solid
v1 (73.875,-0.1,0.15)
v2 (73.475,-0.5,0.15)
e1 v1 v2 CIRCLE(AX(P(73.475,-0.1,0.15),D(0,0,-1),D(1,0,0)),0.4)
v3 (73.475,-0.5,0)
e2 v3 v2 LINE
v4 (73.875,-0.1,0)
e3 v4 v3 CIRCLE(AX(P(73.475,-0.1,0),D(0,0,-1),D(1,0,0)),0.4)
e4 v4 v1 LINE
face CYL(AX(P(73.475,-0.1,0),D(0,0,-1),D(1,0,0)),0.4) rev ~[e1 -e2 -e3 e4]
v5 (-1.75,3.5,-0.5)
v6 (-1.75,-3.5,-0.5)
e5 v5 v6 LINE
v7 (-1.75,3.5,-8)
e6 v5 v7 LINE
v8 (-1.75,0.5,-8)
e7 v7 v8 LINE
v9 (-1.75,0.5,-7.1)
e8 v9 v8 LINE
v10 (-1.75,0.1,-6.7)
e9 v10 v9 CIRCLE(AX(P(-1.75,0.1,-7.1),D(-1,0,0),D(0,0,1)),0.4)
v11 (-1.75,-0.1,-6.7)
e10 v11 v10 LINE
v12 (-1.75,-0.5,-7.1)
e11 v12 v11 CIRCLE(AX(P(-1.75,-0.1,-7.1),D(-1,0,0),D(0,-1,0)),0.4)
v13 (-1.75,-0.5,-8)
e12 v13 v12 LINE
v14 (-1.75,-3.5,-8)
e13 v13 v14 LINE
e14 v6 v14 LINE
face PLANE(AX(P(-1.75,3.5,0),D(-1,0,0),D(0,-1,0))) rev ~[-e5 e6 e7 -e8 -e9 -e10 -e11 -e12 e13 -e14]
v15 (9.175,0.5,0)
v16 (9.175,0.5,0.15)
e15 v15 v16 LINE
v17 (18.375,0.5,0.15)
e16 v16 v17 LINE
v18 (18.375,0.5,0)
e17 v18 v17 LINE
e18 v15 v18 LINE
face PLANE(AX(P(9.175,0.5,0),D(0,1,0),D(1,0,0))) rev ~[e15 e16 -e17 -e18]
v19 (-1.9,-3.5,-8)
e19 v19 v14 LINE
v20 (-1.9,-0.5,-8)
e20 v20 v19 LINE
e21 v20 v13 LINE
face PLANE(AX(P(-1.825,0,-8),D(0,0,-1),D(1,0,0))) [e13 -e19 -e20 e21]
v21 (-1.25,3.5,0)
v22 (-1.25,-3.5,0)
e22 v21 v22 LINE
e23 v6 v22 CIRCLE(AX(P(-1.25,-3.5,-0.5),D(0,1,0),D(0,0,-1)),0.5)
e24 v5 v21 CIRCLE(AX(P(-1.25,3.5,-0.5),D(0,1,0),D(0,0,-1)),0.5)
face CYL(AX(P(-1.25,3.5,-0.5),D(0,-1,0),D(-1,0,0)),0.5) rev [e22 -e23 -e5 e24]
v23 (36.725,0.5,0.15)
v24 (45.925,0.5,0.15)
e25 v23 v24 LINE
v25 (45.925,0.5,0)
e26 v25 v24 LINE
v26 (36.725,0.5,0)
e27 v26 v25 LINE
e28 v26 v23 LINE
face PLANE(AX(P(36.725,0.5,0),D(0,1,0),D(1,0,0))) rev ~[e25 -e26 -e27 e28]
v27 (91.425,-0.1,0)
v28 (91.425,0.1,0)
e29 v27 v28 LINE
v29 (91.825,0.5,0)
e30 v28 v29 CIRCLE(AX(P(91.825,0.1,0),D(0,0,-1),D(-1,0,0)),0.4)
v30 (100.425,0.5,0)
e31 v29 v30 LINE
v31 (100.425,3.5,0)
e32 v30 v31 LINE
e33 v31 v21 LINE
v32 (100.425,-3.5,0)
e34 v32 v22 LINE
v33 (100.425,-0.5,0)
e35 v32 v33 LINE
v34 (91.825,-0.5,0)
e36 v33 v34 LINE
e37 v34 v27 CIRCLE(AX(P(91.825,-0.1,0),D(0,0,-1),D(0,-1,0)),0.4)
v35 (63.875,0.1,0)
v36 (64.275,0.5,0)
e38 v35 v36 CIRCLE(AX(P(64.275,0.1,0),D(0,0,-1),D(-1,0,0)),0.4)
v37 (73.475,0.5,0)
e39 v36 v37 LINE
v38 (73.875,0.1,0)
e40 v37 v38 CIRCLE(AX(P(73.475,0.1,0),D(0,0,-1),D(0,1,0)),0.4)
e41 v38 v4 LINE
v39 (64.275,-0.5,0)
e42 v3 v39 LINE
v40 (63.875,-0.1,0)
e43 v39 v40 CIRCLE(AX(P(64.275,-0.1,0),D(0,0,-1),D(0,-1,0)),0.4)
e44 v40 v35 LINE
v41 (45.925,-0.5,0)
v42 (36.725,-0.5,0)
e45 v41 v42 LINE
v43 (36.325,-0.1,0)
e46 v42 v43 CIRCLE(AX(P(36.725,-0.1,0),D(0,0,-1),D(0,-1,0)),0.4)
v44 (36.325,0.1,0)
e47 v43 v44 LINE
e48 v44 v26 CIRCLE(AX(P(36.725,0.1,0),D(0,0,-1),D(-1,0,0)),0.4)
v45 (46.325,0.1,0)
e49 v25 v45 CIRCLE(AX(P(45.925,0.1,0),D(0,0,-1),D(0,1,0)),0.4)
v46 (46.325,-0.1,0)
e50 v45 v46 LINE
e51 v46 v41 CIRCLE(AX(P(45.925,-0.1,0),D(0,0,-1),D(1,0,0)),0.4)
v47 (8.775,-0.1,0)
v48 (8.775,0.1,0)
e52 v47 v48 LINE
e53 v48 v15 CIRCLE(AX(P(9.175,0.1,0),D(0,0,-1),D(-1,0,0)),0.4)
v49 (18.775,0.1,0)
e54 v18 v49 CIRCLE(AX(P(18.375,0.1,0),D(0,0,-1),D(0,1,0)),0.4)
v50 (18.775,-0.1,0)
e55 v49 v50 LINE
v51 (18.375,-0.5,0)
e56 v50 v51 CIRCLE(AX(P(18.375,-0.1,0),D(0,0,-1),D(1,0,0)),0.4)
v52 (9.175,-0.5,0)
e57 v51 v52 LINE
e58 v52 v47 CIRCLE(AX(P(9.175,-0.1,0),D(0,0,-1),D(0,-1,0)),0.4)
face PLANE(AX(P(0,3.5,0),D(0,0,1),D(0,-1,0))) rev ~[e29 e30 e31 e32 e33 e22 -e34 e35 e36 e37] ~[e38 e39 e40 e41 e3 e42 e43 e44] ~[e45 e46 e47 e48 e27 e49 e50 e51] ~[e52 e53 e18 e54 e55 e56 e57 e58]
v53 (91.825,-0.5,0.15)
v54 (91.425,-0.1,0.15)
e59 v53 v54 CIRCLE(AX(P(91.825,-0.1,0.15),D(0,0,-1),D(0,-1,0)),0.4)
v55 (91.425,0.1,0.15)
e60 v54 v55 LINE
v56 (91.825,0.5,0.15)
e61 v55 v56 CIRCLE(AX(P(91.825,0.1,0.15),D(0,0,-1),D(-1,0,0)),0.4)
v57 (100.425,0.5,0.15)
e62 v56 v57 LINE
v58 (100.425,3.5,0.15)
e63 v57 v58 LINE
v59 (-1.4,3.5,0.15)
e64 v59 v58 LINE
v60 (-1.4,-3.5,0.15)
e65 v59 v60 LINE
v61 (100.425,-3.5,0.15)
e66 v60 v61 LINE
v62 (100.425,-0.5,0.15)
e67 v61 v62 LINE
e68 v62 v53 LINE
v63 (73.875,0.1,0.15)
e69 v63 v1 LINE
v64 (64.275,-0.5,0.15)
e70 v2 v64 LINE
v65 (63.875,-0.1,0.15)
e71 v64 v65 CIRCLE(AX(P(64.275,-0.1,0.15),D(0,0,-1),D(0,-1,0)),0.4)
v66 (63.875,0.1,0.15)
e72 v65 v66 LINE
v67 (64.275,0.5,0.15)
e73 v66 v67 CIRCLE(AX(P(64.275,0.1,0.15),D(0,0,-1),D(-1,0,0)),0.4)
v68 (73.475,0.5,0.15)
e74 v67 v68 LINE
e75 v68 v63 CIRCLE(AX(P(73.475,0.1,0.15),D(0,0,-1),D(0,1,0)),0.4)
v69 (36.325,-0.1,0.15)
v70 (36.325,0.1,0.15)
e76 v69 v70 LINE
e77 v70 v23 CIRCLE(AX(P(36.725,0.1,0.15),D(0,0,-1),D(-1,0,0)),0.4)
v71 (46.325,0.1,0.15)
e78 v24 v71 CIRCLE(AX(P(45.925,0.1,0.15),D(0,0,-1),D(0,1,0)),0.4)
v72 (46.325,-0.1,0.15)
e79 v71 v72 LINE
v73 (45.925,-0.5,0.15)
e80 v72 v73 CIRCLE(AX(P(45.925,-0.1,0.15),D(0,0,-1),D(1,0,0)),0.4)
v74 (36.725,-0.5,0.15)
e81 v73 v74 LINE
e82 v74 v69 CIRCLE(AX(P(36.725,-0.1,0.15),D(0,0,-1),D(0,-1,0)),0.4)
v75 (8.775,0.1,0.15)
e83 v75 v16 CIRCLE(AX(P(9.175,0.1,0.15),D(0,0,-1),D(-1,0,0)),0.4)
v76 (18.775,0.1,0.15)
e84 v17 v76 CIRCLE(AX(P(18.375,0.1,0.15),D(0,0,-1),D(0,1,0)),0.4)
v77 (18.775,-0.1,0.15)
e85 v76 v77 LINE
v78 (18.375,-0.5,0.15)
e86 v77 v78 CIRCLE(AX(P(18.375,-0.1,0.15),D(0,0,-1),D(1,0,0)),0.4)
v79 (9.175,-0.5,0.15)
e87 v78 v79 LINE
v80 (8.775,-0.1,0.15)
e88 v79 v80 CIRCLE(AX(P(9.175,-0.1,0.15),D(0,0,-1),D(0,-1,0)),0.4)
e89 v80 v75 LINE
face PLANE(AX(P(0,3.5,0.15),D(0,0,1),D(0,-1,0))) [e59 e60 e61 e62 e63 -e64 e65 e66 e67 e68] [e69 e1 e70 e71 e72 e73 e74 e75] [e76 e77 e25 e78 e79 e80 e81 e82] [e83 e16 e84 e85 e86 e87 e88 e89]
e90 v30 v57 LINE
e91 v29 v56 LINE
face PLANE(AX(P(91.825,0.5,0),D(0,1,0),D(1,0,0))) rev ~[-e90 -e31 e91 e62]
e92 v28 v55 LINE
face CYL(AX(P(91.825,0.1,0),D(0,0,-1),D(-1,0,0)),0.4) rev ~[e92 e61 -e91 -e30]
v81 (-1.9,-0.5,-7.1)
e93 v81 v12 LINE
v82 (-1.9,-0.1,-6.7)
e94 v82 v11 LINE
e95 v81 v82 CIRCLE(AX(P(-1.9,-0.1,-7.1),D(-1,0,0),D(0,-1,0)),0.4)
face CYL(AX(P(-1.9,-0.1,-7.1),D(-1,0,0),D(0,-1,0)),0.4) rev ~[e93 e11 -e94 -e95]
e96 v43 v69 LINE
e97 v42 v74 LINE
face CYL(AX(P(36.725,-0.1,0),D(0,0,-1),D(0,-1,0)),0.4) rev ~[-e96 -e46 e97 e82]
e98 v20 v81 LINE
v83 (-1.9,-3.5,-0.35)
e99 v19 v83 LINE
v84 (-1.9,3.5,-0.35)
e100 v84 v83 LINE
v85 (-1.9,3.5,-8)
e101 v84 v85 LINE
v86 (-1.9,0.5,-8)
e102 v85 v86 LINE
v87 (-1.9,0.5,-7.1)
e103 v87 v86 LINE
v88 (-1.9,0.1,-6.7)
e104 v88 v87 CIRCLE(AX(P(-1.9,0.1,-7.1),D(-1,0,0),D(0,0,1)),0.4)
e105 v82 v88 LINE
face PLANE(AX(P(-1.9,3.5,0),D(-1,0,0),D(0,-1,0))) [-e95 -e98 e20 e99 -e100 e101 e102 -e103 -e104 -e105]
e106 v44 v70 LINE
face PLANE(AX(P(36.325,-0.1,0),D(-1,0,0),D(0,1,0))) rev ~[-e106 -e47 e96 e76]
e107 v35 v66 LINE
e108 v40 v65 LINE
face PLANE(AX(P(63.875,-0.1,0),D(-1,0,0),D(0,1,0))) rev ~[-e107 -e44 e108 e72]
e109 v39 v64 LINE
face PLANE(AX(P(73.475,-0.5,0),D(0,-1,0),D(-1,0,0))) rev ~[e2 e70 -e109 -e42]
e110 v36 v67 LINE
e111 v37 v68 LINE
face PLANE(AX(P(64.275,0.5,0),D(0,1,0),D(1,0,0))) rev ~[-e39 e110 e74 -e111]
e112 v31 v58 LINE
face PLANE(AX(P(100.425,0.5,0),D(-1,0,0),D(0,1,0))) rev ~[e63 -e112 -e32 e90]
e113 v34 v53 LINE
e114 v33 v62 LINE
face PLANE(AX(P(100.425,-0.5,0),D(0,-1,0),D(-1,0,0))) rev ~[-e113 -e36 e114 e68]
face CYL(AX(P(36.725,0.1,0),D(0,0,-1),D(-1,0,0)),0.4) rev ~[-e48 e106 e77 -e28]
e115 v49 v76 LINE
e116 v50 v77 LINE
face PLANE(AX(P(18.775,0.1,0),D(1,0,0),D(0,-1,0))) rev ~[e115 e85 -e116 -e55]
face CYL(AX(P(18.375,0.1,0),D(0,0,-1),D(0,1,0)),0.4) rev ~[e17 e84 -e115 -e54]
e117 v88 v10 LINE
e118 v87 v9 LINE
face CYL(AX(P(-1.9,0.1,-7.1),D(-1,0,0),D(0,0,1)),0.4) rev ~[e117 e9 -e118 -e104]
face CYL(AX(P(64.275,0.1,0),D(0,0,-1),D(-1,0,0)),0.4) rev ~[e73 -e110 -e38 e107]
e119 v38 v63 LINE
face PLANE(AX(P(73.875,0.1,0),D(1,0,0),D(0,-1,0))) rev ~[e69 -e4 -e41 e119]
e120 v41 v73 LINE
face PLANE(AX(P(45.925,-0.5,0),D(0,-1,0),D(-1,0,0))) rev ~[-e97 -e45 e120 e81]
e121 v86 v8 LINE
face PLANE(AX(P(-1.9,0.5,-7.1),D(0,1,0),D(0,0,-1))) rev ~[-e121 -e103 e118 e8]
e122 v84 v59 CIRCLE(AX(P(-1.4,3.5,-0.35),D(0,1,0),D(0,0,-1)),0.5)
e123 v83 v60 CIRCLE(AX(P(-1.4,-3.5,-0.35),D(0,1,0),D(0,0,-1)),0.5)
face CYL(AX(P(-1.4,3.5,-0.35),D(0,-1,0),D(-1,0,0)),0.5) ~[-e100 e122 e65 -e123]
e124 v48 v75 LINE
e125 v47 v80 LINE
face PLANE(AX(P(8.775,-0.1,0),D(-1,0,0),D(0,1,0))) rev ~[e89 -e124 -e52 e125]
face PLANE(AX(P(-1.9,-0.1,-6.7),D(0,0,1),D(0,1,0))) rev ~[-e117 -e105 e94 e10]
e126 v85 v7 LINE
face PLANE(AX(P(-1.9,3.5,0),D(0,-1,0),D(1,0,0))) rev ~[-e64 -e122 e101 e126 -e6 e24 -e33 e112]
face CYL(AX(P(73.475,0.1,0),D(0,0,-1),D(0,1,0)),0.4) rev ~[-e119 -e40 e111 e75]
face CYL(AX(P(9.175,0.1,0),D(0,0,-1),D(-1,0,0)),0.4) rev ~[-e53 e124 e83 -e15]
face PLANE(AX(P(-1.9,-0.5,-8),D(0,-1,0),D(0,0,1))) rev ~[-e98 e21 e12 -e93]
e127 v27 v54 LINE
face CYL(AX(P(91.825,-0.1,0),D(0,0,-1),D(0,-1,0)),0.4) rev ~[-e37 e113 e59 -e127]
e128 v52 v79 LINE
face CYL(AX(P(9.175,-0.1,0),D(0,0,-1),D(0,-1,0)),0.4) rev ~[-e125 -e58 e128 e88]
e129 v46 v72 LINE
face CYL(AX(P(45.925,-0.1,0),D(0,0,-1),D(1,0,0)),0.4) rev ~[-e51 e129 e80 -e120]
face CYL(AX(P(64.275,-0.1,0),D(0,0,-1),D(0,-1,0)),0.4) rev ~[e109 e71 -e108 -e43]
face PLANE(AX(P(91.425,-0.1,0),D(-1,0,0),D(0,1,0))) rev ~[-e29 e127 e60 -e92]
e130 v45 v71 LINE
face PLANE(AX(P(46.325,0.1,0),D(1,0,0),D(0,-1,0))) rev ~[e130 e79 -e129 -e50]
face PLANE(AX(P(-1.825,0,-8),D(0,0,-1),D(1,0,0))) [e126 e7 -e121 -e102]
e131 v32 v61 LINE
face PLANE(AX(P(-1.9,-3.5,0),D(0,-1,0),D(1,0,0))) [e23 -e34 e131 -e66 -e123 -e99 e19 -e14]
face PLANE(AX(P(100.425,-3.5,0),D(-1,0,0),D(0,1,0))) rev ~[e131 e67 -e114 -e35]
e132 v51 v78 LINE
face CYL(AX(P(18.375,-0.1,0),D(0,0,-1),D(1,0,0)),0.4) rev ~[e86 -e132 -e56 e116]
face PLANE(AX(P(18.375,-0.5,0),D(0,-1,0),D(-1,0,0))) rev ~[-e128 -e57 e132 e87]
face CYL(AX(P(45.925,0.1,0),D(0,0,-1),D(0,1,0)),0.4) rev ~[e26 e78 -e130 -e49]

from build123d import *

# Parameters (mm, degrees)
F0_W     = 4
F0_H     = 3
F1_DEPTH = 0.15
F2_DEPTH = 1.9
F3_W     = 0.15
F3_H     = 7
F4_DEPTH = 8
F6_DEPTH = 25
F7_R     = 0.5


with BuildPart() as f1:
    # F0 (on Top) → F1 (new body)
    with BuildSketch(Plane.XY):
        with BuildLine():
            Line((0, 3.5), (0, -3.5))
            Line((0, -3.5), (13.775, -3.5))
            Line((13.775, -3.5), (13.775, -0.5))
            Line((13.775, -0.5), (9.175, -0.5))
            ThreePointArc((9.175, -0.5), (8.8921572875, -0.3828427125), (8.775, -0.1))
            Line((8.775, -0.1), (8.775, 0.1))
            ThreePointArc((8.775, 0.1), (8.8921572875, 0.3828427125), (9.175, 0.5))
            Line((9.175, 0.5), (13.775, 0.5))
            Line((13.775, 0.5), (13.775, 3.5))
            Line((13.775, 3.5), (0, 3.5))
        make_face()
        with BuildLine():
            Line((13.775, -0.5), (13.775, -3.5))
            Line((13.775, -3.5), (27.55, -3.5))
            Line((27.55, -3.5), (41.325, -3.5))
            Line((41.325, -3.5), (41.325, -0.5))
            Line((41.325, -0.5), (36.725, -0.5))
            ThreePointArc((36.725, -0.5), (36.4421572875, -0.3828427125), (36.325, -0.1))
            Line((36.325, -0.1), (36.325, 0.1))
            ThreePointArc((36.325, 0.1), (36.4421572875, 0.3828427125), (36.725, 0.5))
            Line((36.725, 0.5), (41.325, 0.5))
            Line((41.325, 0.5), (41.325, 3.5))
            Line((41.325, 3.5), (27.55, 3.5))
            Line((27.55, 3.5), (13.775, 3.5))
            Line((13.775, 3.5), (13.775, 0.5))
            Line((13.775, 0.5), (18.375, 0.5))
            ThreePointArc((18.375, 0.5), (18.6578427125, 0.3828427125), (18.775, 0.1))
            Line((18.775, 0.1), (18.775, -0.1))
            ThreePointArc((18.775, -0.1), (18.6578427125, -0.3828427125), (18.375, -0.5))
            Line((18.375, -0.5), (13.775, -0.5))
        make_face()
        with BuildLine():
            Line((41.325, -0.5), (41.325, -3.5))
            Line((41.325, -3.5), (55.1, -3.5))
            Line((55.1, -3.5), (68.875, -3.5))
            Line((68.875, -3.5), (68.875, -0.5))
            Line((68.875, -0.5), (64.275, -0.5))
            ThreePointArc((64.275, -0.5), (63.9921572875, -0.3828427125), (63.875, -0.1))
            Line((63.875, -0.1), (63.875, 0.1))
            ThreePointArc((63.875, 0.1), (63.9921572875, 0.3828427125), (64.275, 0.5))
            Line((64.275, 0.5), (68.875, 0.5))
            Line((68.875, 0.5), (68.875, 3.5))
            Line((68.875, 3.5), (55.1, 3.5))
            Line((55.1, 3.5), (41.325, 3.5))
            Line((41.325, 3.5), (41.325, 0.5))
            Line((41.325, 0.5), (45.925, 0.5))
            ThreePointArc((45.925, 0.5), (46.2078427125, 0.3828427125), (46.325, 0.1))
            Line((46.325, 0.1), (46.325, -0.1))
            ThreePointArc((46.325, -0.1), (46.2078427125, -0.3828427125), (45.925, -0.5))
            Line((45.925, -0.5), (41.325, -0.5))
        make_face()
        with BuildLine():
            Line((68.875, -0.5), (68.875, -3.5))
            Line((68.875, -3.5), (82.65, -3.5))
            Line((82.65, -3.5), (96.425, -3.5))
            Line((96.425, -3.5), (96.425, -0.5))
            Line((96.425, -0.5), (91.825, -0.5))
            ThreePointArc((91.825, -0.5), (91.5421572875, -0.3828427125), (91.425, -0.1))
            Line((91.425, -0.1), (91.425, 0.1))
            ThreePointArc((91.425, 0.1), (91.5421572875, 0.3828427125), (91.825, 0.5))
            Line((91.825, 0.5), (96.425, 0.5))
            Line((96.425, 0.5), (96.425, 3.5))
            Line((96.425, 3.5), (82.65, 3.5))
            Line((82.65, 3.5), (68.875, 3.5))
            Line((68.875, 3.5), (68.875, 0.5))
            Line((68.875, 0.5), (73.475, 0.5))
            ThreePointArc((73.475, 0.5), (73.7578427125, 0.3828427125), (73.875, 0.1))
            Line((73.875, 0.1), (73.875, -0.1))
            ThreePointArc((73.875, -0.1), (73.7578427125, -0.3828427125), (73.475, -0.5))
            Line((73.475, -0.5), (68.875, -0.5))
        make_face()
        with Locations((98.425, -2)):
            Rectangle(F0_W, F0_H)
        with Locations((98.425, 2)):
            Rectangle(F0_W, F0_H)
    extrude(amount=F1_DEPTH)

    # F2 (add): a face of the model
    f2_faces = [f1.faces().sort_by_distance(p)[0] for p in [
        (0, 0, 0.075),
    ]]
    extrude(f2_faces, amount=F2_DEPTH)

    # F3 (on face) → F4 (join)
    with BuildSketch(Plane(origin=(0, 0, 0), x_dir=(1, 0, 0), z_dir=(0, 0, -1))):
        with Locations((-1.825, 0)):
            Rectangle(F3_W, F3_H)
    extrude(amount=F4_DEPTH)

    # F5 (on face) → F6 (cut)
    with BuildSketch(Plane(origin=(-1.9, 0, 0), x_dir=(0, -1, 0), z_dir=(-1, 0, 0))):
        with BuildLine():
            ThreePointArc((0.5, -7.1), (0.3828427125, -6.8171572875), (0.1, -6.7))
            Line((0.1, -6.7), (-0.1, -6.7))
            ThreePointArc((-0.1, -6.7), (-0.3828427125, -6.8171572875), (-0.5, -7.1))
            Line((-0.5, -7.1), (-0.5, -8))
            Line((-0.5, -8), (0.5, -8))
            Line((0.5, -8), (0.5, -7.1))
        make_face()
    extrude(amount=-F6_DEPTH, mode=Mode.SUBTRACT)

    # F7
    f7_edges = [f1.edges().sort_by_distance(p)[0] for p in [
        (-1.9, 0, 0.15),
        (-1.75, 0, 0),
    ]]
    fillet(f7_edges, radius=F7_R)


solid = f1.part
